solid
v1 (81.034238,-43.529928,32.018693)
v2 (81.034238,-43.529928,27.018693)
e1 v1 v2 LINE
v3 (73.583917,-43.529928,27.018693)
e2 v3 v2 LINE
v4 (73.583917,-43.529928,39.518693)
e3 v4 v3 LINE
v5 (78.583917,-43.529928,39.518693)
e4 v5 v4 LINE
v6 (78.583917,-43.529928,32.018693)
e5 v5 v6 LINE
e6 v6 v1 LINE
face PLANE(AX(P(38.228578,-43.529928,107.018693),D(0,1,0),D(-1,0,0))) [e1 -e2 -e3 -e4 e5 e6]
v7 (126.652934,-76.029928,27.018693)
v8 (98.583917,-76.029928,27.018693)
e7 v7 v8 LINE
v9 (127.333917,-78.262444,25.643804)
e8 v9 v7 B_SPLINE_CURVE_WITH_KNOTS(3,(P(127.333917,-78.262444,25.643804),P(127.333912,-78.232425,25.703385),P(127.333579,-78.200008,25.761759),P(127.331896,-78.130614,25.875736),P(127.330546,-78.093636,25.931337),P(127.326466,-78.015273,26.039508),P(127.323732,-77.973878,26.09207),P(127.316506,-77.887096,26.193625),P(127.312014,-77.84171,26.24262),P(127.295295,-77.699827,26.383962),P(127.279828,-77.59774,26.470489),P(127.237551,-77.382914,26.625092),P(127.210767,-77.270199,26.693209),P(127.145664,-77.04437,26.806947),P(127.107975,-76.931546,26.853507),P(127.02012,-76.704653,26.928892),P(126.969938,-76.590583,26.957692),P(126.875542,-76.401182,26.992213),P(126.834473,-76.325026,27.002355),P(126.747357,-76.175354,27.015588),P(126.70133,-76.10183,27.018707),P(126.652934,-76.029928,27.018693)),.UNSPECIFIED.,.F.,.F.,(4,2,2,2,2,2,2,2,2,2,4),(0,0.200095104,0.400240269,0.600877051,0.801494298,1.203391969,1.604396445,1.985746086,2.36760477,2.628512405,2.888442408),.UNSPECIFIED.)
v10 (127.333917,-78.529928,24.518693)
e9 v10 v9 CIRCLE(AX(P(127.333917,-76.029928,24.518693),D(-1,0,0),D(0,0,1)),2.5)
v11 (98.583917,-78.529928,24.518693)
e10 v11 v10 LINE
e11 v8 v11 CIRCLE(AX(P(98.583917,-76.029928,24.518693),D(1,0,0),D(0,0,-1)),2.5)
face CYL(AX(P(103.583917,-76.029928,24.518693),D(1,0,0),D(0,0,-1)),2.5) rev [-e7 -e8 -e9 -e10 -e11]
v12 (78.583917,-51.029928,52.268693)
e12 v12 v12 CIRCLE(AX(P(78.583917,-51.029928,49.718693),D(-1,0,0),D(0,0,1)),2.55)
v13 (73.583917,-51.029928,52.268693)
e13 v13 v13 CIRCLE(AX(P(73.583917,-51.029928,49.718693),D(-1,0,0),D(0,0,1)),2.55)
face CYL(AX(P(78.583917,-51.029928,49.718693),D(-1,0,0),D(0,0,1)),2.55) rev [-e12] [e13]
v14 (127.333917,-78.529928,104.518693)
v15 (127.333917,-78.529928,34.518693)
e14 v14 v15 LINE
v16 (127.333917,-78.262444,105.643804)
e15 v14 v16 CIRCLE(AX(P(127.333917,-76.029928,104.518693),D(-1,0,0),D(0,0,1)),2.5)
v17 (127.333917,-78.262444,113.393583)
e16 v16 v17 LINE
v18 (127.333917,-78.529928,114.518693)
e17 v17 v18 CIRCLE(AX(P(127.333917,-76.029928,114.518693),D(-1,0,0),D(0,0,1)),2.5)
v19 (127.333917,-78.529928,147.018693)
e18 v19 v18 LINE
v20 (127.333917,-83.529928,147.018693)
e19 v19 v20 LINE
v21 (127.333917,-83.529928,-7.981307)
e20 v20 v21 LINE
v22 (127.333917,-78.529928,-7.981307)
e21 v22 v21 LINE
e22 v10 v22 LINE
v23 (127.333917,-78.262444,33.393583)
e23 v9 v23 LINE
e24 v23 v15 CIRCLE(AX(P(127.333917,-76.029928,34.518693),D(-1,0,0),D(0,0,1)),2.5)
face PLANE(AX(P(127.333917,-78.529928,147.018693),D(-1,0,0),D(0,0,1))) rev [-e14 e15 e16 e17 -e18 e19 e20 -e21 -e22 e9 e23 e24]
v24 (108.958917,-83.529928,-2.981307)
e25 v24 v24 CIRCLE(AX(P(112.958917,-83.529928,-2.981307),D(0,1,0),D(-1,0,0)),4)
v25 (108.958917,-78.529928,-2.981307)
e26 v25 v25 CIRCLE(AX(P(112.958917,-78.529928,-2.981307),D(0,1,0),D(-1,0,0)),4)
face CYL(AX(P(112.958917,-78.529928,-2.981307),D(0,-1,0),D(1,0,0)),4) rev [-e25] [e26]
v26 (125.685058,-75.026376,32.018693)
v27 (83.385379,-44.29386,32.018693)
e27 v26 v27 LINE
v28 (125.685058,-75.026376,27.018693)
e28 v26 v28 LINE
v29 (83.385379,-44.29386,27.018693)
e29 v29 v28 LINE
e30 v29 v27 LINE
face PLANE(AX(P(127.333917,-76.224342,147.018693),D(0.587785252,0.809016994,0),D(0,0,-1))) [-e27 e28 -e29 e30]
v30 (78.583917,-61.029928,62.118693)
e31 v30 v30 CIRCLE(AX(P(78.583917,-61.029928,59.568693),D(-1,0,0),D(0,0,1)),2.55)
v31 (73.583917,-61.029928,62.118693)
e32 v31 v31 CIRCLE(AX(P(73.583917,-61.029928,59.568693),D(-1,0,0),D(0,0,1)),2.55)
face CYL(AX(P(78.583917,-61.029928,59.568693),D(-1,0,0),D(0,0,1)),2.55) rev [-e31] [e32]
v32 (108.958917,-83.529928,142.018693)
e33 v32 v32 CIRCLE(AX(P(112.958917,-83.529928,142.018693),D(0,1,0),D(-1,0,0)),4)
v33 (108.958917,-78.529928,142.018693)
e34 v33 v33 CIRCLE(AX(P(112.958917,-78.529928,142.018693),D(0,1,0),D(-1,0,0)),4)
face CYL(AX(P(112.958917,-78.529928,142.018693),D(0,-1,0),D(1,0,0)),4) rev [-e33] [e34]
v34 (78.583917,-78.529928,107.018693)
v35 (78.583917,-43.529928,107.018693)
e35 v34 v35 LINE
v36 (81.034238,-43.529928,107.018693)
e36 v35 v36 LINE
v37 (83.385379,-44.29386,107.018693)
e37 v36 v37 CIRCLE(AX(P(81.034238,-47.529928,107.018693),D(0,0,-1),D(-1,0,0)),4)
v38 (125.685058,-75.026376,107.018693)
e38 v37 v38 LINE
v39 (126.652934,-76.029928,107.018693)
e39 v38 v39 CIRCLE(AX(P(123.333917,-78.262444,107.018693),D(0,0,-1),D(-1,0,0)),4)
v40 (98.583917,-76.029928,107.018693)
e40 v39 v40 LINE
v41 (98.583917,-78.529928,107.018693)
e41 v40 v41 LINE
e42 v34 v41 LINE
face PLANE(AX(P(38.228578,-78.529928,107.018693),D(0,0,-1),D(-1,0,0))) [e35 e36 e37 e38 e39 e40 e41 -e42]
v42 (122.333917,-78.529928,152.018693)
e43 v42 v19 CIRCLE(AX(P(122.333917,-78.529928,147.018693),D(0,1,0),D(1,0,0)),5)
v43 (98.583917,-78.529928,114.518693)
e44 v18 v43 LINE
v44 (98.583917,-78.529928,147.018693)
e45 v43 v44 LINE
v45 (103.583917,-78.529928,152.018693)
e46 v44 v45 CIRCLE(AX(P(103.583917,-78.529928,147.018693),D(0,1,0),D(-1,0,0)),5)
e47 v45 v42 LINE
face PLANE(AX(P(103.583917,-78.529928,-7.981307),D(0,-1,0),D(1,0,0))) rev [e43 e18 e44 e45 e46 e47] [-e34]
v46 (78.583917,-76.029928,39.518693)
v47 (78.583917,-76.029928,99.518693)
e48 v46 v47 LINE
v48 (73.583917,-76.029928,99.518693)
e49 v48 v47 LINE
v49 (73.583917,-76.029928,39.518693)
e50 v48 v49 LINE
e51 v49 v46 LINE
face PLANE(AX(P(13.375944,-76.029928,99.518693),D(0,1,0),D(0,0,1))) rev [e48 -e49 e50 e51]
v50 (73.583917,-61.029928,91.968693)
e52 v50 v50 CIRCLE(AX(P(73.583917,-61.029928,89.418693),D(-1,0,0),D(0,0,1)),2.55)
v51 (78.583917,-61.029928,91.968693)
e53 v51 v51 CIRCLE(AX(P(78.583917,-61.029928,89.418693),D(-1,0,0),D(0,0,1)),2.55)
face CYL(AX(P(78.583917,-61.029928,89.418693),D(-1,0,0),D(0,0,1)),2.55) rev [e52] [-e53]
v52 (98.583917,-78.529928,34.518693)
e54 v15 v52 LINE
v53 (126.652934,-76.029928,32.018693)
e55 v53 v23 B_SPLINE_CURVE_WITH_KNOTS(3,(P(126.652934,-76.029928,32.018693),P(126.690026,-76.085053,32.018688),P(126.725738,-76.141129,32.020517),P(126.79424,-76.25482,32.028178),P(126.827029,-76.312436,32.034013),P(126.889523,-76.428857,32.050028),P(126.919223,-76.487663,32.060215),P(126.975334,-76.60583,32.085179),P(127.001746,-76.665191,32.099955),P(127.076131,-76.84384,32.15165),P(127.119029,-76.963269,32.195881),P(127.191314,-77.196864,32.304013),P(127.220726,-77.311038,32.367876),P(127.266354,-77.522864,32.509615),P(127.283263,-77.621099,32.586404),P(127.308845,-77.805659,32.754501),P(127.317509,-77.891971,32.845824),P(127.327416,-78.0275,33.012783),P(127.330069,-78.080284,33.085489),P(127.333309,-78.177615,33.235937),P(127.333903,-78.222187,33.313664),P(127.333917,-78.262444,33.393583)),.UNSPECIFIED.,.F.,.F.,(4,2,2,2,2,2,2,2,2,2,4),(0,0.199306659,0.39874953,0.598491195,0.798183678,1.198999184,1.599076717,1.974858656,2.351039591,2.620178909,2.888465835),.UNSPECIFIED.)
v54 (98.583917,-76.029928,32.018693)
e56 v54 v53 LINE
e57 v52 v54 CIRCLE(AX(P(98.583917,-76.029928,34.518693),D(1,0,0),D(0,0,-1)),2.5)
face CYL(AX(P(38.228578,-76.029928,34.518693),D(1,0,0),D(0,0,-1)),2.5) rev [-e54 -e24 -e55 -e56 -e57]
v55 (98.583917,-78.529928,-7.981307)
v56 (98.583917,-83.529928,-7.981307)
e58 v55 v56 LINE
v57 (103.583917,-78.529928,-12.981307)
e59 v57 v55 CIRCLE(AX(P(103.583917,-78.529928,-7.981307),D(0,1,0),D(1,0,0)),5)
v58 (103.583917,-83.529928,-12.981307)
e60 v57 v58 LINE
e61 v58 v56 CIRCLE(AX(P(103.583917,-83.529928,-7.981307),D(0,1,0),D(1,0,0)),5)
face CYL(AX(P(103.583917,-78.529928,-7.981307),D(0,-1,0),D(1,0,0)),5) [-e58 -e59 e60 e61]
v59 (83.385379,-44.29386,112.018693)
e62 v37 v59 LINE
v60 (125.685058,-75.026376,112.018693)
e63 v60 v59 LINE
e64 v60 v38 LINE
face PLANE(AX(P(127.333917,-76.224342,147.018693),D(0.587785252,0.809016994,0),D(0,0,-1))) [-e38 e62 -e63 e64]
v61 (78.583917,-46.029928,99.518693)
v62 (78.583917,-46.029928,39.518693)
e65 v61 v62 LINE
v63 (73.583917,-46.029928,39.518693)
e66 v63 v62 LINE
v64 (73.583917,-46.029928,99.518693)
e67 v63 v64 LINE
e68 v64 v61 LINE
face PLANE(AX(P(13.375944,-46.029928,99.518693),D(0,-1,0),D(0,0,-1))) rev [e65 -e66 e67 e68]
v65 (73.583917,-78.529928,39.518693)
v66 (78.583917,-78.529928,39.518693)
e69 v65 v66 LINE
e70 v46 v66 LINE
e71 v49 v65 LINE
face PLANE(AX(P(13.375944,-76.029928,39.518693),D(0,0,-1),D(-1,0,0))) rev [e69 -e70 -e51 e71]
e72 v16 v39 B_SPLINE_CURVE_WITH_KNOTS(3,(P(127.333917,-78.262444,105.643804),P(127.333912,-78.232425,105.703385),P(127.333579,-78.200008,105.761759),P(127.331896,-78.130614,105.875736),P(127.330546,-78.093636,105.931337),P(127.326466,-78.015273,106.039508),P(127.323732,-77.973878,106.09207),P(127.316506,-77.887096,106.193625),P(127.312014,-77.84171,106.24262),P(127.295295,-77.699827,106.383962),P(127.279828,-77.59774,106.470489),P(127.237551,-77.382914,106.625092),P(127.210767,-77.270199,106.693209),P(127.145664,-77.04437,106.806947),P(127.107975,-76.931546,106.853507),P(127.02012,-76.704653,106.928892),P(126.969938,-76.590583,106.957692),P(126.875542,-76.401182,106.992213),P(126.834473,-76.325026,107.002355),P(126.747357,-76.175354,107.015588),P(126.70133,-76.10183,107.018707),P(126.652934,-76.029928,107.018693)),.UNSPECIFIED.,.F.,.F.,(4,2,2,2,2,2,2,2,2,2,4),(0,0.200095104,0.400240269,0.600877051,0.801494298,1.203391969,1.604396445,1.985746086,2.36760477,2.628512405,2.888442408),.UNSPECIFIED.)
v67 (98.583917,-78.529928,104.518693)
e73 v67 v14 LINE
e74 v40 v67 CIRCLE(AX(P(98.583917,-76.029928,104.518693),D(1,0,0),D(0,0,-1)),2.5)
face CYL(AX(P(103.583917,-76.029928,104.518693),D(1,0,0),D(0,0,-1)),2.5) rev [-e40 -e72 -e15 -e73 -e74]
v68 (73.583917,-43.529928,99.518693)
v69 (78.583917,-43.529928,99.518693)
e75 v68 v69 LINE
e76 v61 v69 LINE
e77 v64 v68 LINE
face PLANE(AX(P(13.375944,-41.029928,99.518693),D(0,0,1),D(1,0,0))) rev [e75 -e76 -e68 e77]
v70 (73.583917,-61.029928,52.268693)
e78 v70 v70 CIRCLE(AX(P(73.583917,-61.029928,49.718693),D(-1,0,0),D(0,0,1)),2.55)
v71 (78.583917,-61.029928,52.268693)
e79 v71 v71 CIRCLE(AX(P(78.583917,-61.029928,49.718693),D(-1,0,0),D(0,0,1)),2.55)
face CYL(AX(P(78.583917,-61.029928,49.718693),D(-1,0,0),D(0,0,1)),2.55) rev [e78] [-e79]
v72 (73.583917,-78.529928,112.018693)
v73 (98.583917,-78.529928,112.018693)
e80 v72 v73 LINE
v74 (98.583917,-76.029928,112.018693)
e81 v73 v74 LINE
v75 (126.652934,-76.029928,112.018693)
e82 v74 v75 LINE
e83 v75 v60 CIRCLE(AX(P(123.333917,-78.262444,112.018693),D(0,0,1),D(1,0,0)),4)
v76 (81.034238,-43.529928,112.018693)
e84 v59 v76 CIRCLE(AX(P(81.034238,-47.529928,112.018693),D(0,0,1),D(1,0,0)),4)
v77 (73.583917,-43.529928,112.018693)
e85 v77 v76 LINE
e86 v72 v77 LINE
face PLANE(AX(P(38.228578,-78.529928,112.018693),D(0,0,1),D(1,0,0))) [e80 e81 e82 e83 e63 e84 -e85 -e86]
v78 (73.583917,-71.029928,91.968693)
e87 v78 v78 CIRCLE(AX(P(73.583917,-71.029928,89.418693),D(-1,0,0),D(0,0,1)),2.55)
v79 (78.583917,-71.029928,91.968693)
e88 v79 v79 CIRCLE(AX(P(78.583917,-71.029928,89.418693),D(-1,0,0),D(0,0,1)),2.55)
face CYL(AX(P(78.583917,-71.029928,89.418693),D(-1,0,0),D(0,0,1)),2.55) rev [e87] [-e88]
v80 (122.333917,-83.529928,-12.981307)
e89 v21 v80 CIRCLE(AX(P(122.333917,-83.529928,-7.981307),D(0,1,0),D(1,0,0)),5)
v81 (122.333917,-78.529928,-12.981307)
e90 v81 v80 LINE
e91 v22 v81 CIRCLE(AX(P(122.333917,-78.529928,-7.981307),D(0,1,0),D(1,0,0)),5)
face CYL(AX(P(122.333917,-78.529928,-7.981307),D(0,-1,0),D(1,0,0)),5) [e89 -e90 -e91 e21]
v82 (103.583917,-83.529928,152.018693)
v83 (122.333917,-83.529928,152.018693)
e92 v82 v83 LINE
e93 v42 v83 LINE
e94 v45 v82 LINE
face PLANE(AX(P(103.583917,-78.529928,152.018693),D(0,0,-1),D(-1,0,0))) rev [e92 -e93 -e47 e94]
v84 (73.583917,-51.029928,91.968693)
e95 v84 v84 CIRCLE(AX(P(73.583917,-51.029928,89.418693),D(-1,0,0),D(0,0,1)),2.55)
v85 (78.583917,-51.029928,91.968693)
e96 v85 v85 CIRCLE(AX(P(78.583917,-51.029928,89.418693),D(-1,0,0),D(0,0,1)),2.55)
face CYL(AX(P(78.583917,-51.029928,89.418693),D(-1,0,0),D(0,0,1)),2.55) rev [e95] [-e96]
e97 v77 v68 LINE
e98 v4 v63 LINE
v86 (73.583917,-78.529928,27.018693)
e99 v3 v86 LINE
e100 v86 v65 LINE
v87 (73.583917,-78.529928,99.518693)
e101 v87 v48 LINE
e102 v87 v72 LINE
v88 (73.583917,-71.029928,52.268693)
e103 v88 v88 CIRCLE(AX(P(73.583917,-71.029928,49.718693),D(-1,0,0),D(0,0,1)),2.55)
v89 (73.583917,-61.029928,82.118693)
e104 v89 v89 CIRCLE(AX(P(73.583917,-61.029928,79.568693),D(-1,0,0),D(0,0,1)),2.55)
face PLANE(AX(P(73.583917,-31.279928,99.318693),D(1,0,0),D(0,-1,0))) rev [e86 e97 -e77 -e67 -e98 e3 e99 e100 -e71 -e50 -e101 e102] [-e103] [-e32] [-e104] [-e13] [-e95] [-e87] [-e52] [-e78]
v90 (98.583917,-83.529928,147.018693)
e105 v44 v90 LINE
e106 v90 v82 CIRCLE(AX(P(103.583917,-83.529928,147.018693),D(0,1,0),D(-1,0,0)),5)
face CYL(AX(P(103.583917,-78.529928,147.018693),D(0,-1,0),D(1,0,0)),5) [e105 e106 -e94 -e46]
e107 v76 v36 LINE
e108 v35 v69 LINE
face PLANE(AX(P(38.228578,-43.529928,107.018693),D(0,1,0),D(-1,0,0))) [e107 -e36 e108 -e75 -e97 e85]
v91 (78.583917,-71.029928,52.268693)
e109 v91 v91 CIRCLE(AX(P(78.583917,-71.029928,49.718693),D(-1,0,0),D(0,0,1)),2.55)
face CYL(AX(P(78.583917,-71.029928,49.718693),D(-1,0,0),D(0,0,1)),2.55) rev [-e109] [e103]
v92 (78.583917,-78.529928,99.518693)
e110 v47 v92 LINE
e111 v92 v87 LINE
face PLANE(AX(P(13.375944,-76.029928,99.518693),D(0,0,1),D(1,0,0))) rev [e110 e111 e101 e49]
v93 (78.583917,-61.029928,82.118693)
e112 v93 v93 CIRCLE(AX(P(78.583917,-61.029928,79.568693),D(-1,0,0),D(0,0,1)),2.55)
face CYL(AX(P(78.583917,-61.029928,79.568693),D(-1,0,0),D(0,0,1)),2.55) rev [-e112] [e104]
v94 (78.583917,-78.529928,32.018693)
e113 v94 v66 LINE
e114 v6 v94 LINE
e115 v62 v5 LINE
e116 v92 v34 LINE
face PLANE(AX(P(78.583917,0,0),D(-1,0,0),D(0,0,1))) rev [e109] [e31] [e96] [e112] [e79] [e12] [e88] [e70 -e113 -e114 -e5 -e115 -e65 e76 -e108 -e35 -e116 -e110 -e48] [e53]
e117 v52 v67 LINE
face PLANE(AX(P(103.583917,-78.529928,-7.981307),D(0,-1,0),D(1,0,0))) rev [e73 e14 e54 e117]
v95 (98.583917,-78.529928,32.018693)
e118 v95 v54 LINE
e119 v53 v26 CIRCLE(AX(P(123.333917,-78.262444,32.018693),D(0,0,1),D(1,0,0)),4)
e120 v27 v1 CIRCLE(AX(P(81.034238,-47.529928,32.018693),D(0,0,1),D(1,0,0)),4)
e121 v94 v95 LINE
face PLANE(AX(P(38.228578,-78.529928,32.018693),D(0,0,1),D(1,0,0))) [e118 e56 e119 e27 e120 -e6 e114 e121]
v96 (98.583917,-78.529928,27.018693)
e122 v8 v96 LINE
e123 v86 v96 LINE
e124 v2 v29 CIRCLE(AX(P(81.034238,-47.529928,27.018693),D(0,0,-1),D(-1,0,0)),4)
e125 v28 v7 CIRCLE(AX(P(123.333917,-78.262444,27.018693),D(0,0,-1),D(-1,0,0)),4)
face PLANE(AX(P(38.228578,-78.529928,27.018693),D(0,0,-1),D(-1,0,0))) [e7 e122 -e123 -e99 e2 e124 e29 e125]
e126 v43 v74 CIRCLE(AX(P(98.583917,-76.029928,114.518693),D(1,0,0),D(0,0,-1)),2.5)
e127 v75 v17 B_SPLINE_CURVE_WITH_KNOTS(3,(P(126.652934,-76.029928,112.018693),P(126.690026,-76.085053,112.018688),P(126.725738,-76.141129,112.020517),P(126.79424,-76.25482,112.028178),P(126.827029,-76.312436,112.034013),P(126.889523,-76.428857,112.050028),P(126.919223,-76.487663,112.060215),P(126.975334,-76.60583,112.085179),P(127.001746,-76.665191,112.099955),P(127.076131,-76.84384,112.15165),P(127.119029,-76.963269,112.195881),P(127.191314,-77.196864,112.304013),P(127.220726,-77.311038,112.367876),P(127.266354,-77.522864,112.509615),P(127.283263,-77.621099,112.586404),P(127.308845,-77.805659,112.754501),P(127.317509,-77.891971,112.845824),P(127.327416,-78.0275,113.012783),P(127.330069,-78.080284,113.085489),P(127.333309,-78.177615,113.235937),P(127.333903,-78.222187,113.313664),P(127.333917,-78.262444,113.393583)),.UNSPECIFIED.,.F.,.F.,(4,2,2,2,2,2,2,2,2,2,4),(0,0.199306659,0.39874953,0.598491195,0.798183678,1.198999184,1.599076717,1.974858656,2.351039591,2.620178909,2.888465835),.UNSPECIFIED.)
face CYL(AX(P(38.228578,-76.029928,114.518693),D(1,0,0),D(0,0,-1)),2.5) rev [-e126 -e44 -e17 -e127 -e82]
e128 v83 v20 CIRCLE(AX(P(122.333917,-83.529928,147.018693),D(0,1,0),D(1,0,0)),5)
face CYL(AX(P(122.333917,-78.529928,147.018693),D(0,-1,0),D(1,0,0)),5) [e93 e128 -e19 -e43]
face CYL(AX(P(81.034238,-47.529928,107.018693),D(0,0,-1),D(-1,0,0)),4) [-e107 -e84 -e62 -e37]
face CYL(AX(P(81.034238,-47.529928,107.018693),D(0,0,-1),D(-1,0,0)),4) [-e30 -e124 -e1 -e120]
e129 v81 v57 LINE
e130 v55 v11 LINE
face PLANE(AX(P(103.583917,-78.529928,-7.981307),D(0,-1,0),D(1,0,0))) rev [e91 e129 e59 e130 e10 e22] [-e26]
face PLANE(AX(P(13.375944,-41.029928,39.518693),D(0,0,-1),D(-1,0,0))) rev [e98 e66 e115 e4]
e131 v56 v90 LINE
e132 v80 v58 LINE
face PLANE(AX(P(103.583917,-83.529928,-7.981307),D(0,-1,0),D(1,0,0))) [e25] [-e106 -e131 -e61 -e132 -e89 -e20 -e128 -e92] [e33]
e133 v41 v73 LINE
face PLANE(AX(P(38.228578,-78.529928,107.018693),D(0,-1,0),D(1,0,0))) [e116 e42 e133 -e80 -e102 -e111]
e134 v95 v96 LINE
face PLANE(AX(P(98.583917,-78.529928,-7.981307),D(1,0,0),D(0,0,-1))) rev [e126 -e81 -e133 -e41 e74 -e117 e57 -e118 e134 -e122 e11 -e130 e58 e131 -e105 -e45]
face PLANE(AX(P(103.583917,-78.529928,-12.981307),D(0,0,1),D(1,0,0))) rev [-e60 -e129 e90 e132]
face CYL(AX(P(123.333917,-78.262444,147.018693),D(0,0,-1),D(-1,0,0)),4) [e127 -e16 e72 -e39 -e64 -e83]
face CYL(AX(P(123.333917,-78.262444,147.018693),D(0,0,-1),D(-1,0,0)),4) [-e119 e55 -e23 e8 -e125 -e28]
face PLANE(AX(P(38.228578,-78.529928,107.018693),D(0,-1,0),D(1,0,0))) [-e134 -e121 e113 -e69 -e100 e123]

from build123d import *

# Parameters (mm, degrees)
SKETCH1_R           = 4
BOSS_EXTRUDE1_DEPTH = 5
SKETCH2_W           = 5
SKETCH2_H           = 35
BOSS_EXTRUDE2_DEPTH = 53.75
SKETCH3_W           = 75
SKETCH3_H           = 35
SKETCH3_R           = 2.55
BOSS_EXTRUDE3_DEPTH = 5
CHAMFER1_SIZE       = 45
CHAMFER1_SIZE2      = 32.69441376
FILLET1_R           = 4
FILLET2_START       = 98.583917136
FILLET2_DEPTH       = 28.75
FILLET2_START_2     = 25.643804114
FILLET2_2_DEPTH     = 87.749778627
SKETCH4_W           = 60
SKETCH4_H           = 5
CUT_EXTRUDE1_DEPTH  = 5


with BuildPart() as part:
    # Sketch1 → Boss-Extrude1 (new body)
    with BuildSketch(Plane(origin=(0, -83.529928381, 0), x_dir=(1, 0, 0), z_dir=(0, 1, 0))):
        with BuildLine():
            Line((103.583917136, -152.018693427), (122.333917136, -152.018693427))
            ThreePointArc((122.333917136, -152.018693427), (125.869451042, -150.554227333), (127.333917136, -147.018693427))
            Line((127.333917136, -147.018693427), (127.333917136, 7.981306573))
            ThreePointArc((127.333917136, 7.981306573), (125.869451042, 11.516840479), (122.333917136, 12.981306573))
            Line((122.333917136, 12.981306573), (103.583917136, 12.981306573))
            ThreePointArc((103.583917136, 12.981306573), (100.04838323, 11.516840479), (98.583917136, 7.981306573))
            Line((98.583917136, 7.981306573), (98.583917136, -147.018693427))
            ThreePointArc((98.583917136, -147.018693427), (100.04838323, -150.554227333), (103.583917136, -152.018693427))
        make_face()
        with Locations(Location((112.958917136, -142.018693427, 0), (0, 0, 180))):
            Circle(SKETCH1_R, mode=Mode.SUBTRACT)
        with Locations(Location((112.958917136, 2.981306573, 0), (0, 0, 180))):
            Circle(SKETCH1_R, mode=Mode.SUBTRACT)
    extrude(amount=BOSS_EXTRUDE1_DEPTH)

    # Sketch2 → Boss-Extrude2 (add)
    with BuildSketch(Plane(origin=(127.333917136, 0, 0), x_dir=(0, 0, -1), z_dir=(1, 0, 0))):
        with Locations((-109.518693427, -61.029928381)):
            Rectangle(SKETCH2_W, SKETCH2_H)
        with Locations((-29.518693427, -61.029928381)):
            Rectangle(SKETCH2_W, SKETCH2_H)
    extrude(amount=-BOSS_EXTRUDE2_DEPTH)

    # Sketch3 → Boss-Extrude3 (add)
    with BuildSketch(Plane.ZY.offset(-73.583917136)):
        with Locations((69.518693427, -61.029928381)):
            Rectangle(SKETCH3_W, SKETCH3_H)
        with Locations((49.718693427, -61.029928381)):
            Circle(SKETCH3_R, mode=Mode.SUBTRACT)
        with Locations((89.418693427, -61.029928381)):
            Circle(SKETCH3_R, mode=Mode.SUBTRACT)
        with Locations((89.418693427, -71.029928381)):
            Circle(SKETCH3_R, mode=Mode.SUBTRACT)
        with Locations((89.418693427, -51.029928381)):
            Circle(SKETCH3_R, mode=Mode.SUBTRACT)
        with Locations((49.718693427, -51.029928381)):
            Circle(SKETCH3_R, mode=Mode.SUBTRACT)
        with Locations((49.718693427, -71.029928381)):
            Circle(SKETCH3_R, mode=Mode.SUBTRACT)
        with Locations((59.568693427, -61.029928381)):
            Circle(SKETCH3_R, mode=Mode.SUBTRACT)
        with Locations((79.568693427, -61.029928381)):
            Circle(SKETCH3_R, mode=Mode.SUBTRACT)
    extrude(amount=-BOSS_EXTRUDE3_DEPTH)

    # Chamfer1
    chamfer1_edges = [part.edges().sort_by_distance(p)[0] for p in [
        (127.333917136, -43.529928381, 109.518693427),
        (127.333917136, -43.529928381, 29.518693427),
    ]]
    chamfer1_side = [part.faces().sort_by_distance(p)[0] for p in [
        (100.458917136, -43.529928381, 111.013006473),
    ]]
    chamfer(chamfer1_edges, length=CHAMFER1_SIZE, length2=CHAMFER1_SIZE2, reference=chamfer1_side[0])

    # Fillet1
    fillet1_edges = [part.edges().sort_by_distance(p)[0] for p in [
        (127.333917136, -76.224342141, 29.518693427),
        (127.333917136, -76.224342141, 109.518693427),
        (82.333917136, -43.529928381, 29.518693427),
        (82.333917136, -43.529928381, 109.518693427),
    ]]
    fillet(fillet1_edges, radius=FILLET1_R)

    # Fillet2: read off the stored shape, not the designer's step
    # Fillet2 outline → Fillet2 (add)
    with BuildSketch(Plane.YZ.offset(FILLET2_START)):
        with BuildLine():
            ThreePointArc((-78.529928381, 24.518693427), (-77.797695334, 26.28646038), (-76.029928381, 27.018693427))
            Line((-76.029928381, 27.018693427), (-78.529928381, 27.018693427))
            Line((-78.529928381, 27.018693427), (-78.529928381, 24.518693427))
        make_face()
        with BuildLine():
            ThreePointArc((-76.029928381, 32.018693427), (-77.797695334, 32.750926474), (-78.529928381, 34.518693427))
            Line((-78.529928381, 34.518693427), (-78.529928381, 32.018693427))
            Line((-78.529928381, 32.018693427), (-76.029928381, 32.018693427))
        make_face()
        with BuildLine():
            ThreePointArc((-78.529928381, 104.518693427), (-77.797695334, 106.28646038), (-76.029928381, 107.018693427))
            Line((-76.029928381, 107.018693427), (-78.529928381, 107.018693427))
            Line((-78.529928381, 107.018693427), (-78.529928381, 104.518693427))
        make_face()
        with BuildLine():
            ThreePointArc((-76.029928381, 112.018693427), (-77.797695334, 112.750926474), (-78.529928381, 114.518693427))
            Line((-78.529928381, 114.518693427), (-78.529928381, 112.018693427))
            Line((-78.529928381, 112.018693427), (-76.029928381, 112.018693427))
        make_face()
    extrude(amount=FILLET2_DEPTH)

    # Fillet2 2 outline → Fillet2 2 (cut)
    with BuildSketch(Plane.XY.offset(FILLET2_START_2)):
        with BuildLine():
            Line((127.333917136, -76.029928381), (126.652934202, -76.029928381))
            ThreePointArc((126.652934202, -76.029928381), (127.159885528, -77.095411005), (127.333917136, -78.262443939))
            Line((127.333917136, -78.262443939), (127.333917136, -76.029928381))
        make_face()
    extrude(amount=FILLET2_2_DEPTH, mode=Mode.SUBTRACT)

    # Sketch4 → Cut-Extrude1 (cut)
    with BuildSketch(Plane(origin=(78.583917136, 0, 0), x_dir=(0, 0, -1), z_dir=(1, 0, 0))):
        with Locations((-69.518693427, -43.529928381)):
            Rectangle(SKETCH4_W, SKETCH4_H)
        with Locations((-69.518693427, -78.529928381)):
            Rectangle(SKETCH4_W, SKETCH4_H)
    extrude(amount=-CUT_EXTRUDE1_DEPTH, mode=Mode.SUBTRACT)


solid = part.part
